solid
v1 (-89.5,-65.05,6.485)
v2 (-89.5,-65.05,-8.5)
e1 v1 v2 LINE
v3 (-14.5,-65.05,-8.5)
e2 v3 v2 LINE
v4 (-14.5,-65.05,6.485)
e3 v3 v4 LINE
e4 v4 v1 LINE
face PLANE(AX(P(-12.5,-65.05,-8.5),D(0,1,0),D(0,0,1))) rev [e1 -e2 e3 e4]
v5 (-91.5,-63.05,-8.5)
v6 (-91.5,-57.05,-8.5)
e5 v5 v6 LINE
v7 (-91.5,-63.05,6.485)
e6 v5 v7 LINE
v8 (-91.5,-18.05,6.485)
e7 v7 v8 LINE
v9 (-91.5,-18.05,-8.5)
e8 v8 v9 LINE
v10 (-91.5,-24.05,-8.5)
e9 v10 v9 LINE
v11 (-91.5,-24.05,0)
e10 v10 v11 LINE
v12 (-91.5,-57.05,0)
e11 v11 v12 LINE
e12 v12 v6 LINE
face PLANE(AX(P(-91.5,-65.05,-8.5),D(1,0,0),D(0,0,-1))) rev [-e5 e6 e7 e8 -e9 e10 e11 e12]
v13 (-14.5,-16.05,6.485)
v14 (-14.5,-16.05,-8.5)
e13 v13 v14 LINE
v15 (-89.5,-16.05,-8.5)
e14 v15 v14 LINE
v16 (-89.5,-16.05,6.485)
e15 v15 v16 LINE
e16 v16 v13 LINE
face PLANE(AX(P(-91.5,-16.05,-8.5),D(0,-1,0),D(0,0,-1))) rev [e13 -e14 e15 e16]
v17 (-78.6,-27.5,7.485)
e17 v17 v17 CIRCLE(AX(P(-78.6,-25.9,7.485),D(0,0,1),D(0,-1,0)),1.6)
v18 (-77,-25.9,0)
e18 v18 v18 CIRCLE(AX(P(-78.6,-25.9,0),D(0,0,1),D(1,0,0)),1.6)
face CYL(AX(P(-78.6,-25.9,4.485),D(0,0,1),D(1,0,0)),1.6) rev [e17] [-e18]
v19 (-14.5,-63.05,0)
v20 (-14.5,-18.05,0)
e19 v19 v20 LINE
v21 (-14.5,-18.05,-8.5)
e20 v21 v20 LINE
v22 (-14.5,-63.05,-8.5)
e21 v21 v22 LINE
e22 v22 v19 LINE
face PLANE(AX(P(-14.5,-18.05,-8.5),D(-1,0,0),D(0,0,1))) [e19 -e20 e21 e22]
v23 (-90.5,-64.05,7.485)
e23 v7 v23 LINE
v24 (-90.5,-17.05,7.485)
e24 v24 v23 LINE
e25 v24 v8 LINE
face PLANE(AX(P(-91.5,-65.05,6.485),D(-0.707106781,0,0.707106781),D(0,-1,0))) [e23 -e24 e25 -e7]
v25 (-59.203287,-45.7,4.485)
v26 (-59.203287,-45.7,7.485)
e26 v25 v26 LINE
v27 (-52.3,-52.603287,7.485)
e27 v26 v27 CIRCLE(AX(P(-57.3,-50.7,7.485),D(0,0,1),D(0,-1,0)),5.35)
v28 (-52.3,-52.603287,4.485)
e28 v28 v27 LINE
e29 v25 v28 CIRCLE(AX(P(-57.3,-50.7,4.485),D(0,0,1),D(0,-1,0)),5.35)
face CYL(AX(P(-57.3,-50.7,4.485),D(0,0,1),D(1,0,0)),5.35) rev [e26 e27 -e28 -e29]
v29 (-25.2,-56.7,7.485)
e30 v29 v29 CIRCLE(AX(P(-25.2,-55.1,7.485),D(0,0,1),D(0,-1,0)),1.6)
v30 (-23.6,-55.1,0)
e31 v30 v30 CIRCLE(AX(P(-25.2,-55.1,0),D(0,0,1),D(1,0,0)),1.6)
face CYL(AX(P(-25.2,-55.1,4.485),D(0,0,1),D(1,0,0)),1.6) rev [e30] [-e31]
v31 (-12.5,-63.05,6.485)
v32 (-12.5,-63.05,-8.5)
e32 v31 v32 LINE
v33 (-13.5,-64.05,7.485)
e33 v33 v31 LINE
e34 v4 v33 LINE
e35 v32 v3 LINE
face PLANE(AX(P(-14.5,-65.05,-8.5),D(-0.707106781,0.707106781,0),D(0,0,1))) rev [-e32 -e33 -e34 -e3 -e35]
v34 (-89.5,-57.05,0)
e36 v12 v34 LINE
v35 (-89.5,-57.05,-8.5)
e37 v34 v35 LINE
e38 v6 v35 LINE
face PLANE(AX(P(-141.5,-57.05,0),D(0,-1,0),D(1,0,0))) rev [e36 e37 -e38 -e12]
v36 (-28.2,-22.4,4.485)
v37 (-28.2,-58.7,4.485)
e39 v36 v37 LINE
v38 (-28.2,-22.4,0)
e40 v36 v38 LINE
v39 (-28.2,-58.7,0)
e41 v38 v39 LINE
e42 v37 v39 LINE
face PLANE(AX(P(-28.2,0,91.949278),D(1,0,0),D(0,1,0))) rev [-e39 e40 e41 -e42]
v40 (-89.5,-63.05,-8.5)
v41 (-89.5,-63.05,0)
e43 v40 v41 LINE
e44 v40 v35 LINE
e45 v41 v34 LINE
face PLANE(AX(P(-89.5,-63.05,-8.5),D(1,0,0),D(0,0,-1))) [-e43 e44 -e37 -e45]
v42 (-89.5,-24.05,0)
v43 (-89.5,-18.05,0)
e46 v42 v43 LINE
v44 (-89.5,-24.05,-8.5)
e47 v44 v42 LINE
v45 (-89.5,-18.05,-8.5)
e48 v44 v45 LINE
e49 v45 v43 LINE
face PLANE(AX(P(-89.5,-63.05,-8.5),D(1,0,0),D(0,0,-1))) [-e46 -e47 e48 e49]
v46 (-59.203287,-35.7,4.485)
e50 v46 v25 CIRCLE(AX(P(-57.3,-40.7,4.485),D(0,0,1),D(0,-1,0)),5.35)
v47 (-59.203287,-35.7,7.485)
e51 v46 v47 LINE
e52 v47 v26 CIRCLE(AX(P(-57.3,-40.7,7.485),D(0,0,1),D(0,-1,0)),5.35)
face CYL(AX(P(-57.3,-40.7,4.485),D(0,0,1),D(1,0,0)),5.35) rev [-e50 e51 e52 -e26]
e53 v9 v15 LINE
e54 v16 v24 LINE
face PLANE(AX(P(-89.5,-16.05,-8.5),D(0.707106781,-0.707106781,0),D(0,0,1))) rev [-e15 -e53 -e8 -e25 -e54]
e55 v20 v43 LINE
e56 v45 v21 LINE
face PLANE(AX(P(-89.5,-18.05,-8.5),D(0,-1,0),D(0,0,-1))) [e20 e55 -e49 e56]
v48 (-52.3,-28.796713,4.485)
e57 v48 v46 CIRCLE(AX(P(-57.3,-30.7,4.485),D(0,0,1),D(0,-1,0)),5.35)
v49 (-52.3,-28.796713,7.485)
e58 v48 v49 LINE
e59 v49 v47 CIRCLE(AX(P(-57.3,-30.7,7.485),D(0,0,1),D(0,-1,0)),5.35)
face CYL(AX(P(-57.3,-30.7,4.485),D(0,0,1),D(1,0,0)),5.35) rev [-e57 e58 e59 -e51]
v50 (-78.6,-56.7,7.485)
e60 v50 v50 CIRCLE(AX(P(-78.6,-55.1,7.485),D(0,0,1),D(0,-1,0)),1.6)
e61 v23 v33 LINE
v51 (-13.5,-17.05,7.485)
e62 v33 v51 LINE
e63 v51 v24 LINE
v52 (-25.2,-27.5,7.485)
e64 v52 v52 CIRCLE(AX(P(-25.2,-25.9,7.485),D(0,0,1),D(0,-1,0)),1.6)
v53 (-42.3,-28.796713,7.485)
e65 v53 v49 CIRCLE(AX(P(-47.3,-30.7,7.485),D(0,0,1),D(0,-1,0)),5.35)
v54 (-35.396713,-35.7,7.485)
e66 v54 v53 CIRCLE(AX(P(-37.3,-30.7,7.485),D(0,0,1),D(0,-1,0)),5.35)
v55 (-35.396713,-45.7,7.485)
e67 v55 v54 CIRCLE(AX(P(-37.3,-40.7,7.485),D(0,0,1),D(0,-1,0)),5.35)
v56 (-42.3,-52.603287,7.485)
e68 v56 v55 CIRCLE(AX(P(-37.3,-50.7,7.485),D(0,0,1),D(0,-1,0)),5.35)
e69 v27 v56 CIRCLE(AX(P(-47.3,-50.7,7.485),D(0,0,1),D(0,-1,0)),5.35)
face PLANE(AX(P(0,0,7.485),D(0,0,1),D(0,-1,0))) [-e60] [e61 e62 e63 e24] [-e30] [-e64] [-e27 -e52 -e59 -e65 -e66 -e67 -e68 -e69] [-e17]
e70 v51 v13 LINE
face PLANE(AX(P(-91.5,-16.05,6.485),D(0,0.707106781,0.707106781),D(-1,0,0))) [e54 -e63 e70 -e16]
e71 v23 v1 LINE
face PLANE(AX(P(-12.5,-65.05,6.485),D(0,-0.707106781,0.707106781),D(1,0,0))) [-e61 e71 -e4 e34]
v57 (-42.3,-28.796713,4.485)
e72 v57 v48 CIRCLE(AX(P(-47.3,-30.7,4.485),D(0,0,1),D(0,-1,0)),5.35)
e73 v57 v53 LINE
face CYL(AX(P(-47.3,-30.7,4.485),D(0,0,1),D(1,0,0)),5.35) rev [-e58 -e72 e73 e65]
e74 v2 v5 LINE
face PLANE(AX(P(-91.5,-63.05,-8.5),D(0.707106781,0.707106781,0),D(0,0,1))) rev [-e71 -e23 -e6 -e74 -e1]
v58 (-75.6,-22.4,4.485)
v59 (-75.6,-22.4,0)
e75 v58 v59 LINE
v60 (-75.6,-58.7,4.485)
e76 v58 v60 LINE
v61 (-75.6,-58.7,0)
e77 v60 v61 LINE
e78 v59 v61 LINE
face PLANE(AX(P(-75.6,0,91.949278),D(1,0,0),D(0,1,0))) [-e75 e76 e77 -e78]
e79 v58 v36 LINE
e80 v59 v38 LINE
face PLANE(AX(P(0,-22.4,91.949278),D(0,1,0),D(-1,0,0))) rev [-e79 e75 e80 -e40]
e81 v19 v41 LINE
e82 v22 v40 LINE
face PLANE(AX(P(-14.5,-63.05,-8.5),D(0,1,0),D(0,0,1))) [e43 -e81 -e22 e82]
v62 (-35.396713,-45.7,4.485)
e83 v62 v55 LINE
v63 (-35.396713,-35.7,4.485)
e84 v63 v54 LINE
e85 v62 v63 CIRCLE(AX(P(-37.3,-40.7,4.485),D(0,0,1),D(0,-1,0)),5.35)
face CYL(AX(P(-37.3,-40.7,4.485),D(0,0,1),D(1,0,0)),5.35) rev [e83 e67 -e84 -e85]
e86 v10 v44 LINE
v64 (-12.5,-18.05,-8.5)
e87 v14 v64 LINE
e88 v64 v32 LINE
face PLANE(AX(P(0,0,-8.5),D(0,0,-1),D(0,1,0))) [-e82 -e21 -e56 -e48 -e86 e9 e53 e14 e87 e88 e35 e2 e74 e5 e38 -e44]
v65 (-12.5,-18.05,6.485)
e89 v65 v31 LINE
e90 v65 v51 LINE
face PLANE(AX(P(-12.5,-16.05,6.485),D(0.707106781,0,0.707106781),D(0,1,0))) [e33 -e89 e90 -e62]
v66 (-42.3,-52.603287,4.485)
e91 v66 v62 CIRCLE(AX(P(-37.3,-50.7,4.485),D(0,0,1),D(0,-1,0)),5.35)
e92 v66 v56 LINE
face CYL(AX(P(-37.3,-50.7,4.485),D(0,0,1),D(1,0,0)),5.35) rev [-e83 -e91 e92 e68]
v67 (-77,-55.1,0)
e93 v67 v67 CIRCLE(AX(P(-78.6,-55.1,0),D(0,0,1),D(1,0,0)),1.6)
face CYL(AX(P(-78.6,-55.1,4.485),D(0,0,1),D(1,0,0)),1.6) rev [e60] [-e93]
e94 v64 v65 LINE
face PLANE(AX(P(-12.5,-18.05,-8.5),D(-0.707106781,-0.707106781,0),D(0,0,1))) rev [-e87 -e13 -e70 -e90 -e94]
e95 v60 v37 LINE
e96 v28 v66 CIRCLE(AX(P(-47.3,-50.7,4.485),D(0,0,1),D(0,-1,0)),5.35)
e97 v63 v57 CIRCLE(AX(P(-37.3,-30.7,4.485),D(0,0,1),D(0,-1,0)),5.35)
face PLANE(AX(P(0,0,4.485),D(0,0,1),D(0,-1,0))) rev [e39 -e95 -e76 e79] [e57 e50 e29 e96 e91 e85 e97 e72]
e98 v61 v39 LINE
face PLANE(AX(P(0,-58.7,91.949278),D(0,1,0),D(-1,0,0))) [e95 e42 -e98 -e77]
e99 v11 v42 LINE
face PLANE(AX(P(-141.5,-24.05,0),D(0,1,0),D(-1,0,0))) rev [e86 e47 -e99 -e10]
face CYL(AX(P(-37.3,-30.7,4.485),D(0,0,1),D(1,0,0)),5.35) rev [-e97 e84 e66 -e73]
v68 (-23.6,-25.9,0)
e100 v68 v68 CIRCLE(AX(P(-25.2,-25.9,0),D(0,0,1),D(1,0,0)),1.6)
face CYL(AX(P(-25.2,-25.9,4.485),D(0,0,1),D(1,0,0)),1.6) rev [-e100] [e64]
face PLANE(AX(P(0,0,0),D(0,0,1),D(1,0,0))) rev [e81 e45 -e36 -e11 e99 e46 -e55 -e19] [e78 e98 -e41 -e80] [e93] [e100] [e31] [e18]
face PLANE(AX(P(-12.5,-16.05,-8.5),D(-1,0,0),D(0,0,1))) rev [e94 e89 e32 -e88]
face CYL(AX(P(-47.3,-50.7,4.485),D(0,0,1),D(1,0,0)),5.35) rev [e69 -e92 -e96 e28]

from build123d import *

# Parameters (mm, degrees)
BOSS_EXTRUDE1_START      = 4.485
SKETCH1_W                = 75
SKETCH1_H                = 45
SKETCH1_R                = 1.6
SKETCH1_W_2              = 47.4
SKETCH1_H_2              = 36.3
BOSS_EXTRUDE1_DEPTH      = 3
SKETCH1_4_W              = 75
SKETCH1_4_H              = 45
SKETCH1_4_R              = 1.6
SKETCH1_4_W_2            = 47.4
SKETCH1_4_H_2            = 36.3
BOSS_EXTRUDE2_DEPTH      = 4.485
BOSS_EXTRUDE3_DEPTH      = 8.5
BOSS_EXTRUDE3_DEPTH_BACK = 7.485
SKETCH2_W                = 79
SKETCH2_H                = 49
SKETCH2_W_2              = 75
SKETCH2_H_2              = 45
SKETCH4_W                = 8.5
SKETCH4_H                = 33
CUT_EXTRUDE1_DEPTH       = 52
CHAMFER1_SIZE            = 1
CHAMFER2_SIZE            = 2


with BuildPart() as part:
    # Sketch1 → Boss-Extrude1 (new body)
    # profile 1 of 2: a face of its own
    with BuildSketch(Plane.XY.offset(BOSS_EXTRUDE1_START)):
        with Locations((-52, -40.55)):
            Rectangle(SKETCH1_W, SKETCH1_H)
        with Locations(Location((-78.6, -55.1, 0), (0, 0, 270))):
            Circle(SKETCH1_R, mode=Mode.SUBTRACT)
        with Locations(Location((-78.6, -25.9, 0), (0, 0, 270))):
            Circle(SKETCH1_R, mode=Mode.SUBTRACT)
        with Locations(Location((-25.2, -25.9, 0), (0, 0, 270))):
            Circle(SKETCH1_R, mode=Mode.SUBTRACT)
        with Locations(Location((-25.2, -55.1, 0), (0, 0, 270))):
            Circle(SKETCH1_R, mode=Mode.SUBTRACT)
        with Locations((-51.9, -40.55)):
            Rectangle(SKETCH1_W_2, SKETCH1_H_2, mode=Mode.SUBTRACT)
    # profile 2 of 2: a face of its own
    with BuildSketch(Plane.XY.offset(BOSS_EXTRUDE1_START)):
        with Locations((-51.9, -40.55)):
            Rectangle(SKETCH1_W_2, SKETCH1_H_2)
        with BuildLine():
            ThreePointArc((-35.396713369, -35.7), (-32.895168364, -33.736438417), (-31.95, -30.7))
            ThreePointArc((-31.95, -30.7), (-36.332399876, -25.438227485), (-42.3, -28.796713369))
            ThreePointArc((-42.3, -28.796713369), (-47.3, -25.35), (-52.3, -28.796713369))
            ThreePointArc((-52.3, -28.796713369), (-58.267600124, -25.438227485), (-62.65, -30.7))
            ThreePointArc((-62.65, -30.7), (-61.704831636, -33.736438417), (-59.203286631, -35.7))
            ThreePointArc((-59.203286631, -35.7), (-61.704831636, -37.663561583), (-62.65, -40.7))
            ThreePointArc((-62.65, -40.7), (-61.704831636, -43.736438417), (-59.203286631, -45.7))
            ThreePointArc((-59.203286631, -45.7), (-61.704831636, -47.663561583), (-62.65, -50.7))
            ThreePointArc((-62.65, -50.7), (-58.267600124, -55.961772515), (-52.3, -52.603286631))
            ThreePointArc((-52.3, -52.603286631), (-47.3, -56.05), (-42.3, -52.603286631))
            ThreePointArc((-42.3, -52.603286631), (-36.332399876, -55.961772515), (-31.95, -50.7))
            ThreePointArc((-31.95, -50.7), (-32.895168364, -47.663561583), (-35.396713369, -45.7))
            ThreePointArc((-35.396713369, -45.7), (-32.895168364, -43.736438417), (-31.95, -40.7))
            ThreePointArc((-31.95, -40.7), (-32.895168364, -37.663561583), (-35.396713369, -35.7))
        make_face(mode=Mode.SUBTRACT)
    extrude(amount=BOSS_EXTRUDE1_DEPTH)

    # Sketch1<4> → Boss-Extrude2 (add)
    with BuildSketch(Plane.XY):
        with Locations((-52, -40.55)):
            Rectangle(SKETCH1_4_W, SKETCH1_4_H)
        with Locations((-78.6, -55.1)):
            Circle(SKETCH1_4_R, mode=Mode.SUBTRACT)
        with Locations((-78.6, -25.9)):
            Circle(SKETCH1_4_R, mode=Mode.SUBTRACT)
        with Locations((-25.2, -25.9)):
            Circle(SKETCH1_4_R, mode=Mode.SUBTRACT)
        with Locations((-25.2, -55.1)):
            Circle(SKETCH1_4_R, mode=Mode.SUBTRACT)
        with Locations((-51.9, -40.55)):
            Rectangle(SKETCH1_4_W_2, SKETCH1_4_H_2, mode=Mode.SUBTRACT)
    extrude(amount=BOSS_EXTRUDE2_DEPTH)

    # Sketch2 → Boss-Extrude3 (add, two sides: drawn at the far end of the back side and taken through both)
    with BuildSketch(Plane(origin=(0, 0, 0), x_dir=(-1, 0, 0), z_dir=(0, 0, -1)).offset(-BOSS_EXTRUDE3_DEPTH_BACK)):
        with Locations((52, -40.55)):
            Rectangle(SKETCH2_W, SKETCH2_H)
        with Locations((52, -40.55)):
            Rectangle(SKETCH2_W_2, SKETCH2_H_2, mode=Mode.SUBTRACT)
    extrude(amount=BOSS_EXTRUDE3_DEPTH + BOSS_EXTRUDE3_DEPTH_BACK)

    # Sketch4 → Cut-Extrude1 (cut)
    with BuildSketch(Plane(origin=(-89.5, 0, 0), x_dir=(0, 0, -1), z_dir=(1, 0, 0))):
        with Locations((4.25, -40.55)):
            Rectangle(SKETCH4_W, SKETCH4_H)
    extrude(amount=-CUT_EXTRUDE1_DEPTH, mode=Mode.SUBTRACT)

    # Chamfer1
    chamfer1_edges = [part.edges().sort_by_distance(p)[0] for p in [
        (-52, -65.05, 7.485),
        (-91.5, -40.55, 7.485),
        (-52, -16.05, 7.485),
        (-12.5, -40.55, 7.485),
    ]]
    chamfer(chamfer1_edges, length=CHAMFER1_SIZE)

    # Chamfer2
    chamfer2_edges = [part.edges().sort_by_distance(p)[0] for p in [
        (-12.5, -65.05, -1.0075),
        (-91.5, -65.05, -1.0075),
        (-12.5, -16.05, -1.0075),
        (-91.5, -16.05, -1.0075),
    ]]
    chamfer(chamfer2_edges, length=CHAMFER2_SIZE - 0.0001)  # a hair under: the kernel refuses the full size


solid = part.part
